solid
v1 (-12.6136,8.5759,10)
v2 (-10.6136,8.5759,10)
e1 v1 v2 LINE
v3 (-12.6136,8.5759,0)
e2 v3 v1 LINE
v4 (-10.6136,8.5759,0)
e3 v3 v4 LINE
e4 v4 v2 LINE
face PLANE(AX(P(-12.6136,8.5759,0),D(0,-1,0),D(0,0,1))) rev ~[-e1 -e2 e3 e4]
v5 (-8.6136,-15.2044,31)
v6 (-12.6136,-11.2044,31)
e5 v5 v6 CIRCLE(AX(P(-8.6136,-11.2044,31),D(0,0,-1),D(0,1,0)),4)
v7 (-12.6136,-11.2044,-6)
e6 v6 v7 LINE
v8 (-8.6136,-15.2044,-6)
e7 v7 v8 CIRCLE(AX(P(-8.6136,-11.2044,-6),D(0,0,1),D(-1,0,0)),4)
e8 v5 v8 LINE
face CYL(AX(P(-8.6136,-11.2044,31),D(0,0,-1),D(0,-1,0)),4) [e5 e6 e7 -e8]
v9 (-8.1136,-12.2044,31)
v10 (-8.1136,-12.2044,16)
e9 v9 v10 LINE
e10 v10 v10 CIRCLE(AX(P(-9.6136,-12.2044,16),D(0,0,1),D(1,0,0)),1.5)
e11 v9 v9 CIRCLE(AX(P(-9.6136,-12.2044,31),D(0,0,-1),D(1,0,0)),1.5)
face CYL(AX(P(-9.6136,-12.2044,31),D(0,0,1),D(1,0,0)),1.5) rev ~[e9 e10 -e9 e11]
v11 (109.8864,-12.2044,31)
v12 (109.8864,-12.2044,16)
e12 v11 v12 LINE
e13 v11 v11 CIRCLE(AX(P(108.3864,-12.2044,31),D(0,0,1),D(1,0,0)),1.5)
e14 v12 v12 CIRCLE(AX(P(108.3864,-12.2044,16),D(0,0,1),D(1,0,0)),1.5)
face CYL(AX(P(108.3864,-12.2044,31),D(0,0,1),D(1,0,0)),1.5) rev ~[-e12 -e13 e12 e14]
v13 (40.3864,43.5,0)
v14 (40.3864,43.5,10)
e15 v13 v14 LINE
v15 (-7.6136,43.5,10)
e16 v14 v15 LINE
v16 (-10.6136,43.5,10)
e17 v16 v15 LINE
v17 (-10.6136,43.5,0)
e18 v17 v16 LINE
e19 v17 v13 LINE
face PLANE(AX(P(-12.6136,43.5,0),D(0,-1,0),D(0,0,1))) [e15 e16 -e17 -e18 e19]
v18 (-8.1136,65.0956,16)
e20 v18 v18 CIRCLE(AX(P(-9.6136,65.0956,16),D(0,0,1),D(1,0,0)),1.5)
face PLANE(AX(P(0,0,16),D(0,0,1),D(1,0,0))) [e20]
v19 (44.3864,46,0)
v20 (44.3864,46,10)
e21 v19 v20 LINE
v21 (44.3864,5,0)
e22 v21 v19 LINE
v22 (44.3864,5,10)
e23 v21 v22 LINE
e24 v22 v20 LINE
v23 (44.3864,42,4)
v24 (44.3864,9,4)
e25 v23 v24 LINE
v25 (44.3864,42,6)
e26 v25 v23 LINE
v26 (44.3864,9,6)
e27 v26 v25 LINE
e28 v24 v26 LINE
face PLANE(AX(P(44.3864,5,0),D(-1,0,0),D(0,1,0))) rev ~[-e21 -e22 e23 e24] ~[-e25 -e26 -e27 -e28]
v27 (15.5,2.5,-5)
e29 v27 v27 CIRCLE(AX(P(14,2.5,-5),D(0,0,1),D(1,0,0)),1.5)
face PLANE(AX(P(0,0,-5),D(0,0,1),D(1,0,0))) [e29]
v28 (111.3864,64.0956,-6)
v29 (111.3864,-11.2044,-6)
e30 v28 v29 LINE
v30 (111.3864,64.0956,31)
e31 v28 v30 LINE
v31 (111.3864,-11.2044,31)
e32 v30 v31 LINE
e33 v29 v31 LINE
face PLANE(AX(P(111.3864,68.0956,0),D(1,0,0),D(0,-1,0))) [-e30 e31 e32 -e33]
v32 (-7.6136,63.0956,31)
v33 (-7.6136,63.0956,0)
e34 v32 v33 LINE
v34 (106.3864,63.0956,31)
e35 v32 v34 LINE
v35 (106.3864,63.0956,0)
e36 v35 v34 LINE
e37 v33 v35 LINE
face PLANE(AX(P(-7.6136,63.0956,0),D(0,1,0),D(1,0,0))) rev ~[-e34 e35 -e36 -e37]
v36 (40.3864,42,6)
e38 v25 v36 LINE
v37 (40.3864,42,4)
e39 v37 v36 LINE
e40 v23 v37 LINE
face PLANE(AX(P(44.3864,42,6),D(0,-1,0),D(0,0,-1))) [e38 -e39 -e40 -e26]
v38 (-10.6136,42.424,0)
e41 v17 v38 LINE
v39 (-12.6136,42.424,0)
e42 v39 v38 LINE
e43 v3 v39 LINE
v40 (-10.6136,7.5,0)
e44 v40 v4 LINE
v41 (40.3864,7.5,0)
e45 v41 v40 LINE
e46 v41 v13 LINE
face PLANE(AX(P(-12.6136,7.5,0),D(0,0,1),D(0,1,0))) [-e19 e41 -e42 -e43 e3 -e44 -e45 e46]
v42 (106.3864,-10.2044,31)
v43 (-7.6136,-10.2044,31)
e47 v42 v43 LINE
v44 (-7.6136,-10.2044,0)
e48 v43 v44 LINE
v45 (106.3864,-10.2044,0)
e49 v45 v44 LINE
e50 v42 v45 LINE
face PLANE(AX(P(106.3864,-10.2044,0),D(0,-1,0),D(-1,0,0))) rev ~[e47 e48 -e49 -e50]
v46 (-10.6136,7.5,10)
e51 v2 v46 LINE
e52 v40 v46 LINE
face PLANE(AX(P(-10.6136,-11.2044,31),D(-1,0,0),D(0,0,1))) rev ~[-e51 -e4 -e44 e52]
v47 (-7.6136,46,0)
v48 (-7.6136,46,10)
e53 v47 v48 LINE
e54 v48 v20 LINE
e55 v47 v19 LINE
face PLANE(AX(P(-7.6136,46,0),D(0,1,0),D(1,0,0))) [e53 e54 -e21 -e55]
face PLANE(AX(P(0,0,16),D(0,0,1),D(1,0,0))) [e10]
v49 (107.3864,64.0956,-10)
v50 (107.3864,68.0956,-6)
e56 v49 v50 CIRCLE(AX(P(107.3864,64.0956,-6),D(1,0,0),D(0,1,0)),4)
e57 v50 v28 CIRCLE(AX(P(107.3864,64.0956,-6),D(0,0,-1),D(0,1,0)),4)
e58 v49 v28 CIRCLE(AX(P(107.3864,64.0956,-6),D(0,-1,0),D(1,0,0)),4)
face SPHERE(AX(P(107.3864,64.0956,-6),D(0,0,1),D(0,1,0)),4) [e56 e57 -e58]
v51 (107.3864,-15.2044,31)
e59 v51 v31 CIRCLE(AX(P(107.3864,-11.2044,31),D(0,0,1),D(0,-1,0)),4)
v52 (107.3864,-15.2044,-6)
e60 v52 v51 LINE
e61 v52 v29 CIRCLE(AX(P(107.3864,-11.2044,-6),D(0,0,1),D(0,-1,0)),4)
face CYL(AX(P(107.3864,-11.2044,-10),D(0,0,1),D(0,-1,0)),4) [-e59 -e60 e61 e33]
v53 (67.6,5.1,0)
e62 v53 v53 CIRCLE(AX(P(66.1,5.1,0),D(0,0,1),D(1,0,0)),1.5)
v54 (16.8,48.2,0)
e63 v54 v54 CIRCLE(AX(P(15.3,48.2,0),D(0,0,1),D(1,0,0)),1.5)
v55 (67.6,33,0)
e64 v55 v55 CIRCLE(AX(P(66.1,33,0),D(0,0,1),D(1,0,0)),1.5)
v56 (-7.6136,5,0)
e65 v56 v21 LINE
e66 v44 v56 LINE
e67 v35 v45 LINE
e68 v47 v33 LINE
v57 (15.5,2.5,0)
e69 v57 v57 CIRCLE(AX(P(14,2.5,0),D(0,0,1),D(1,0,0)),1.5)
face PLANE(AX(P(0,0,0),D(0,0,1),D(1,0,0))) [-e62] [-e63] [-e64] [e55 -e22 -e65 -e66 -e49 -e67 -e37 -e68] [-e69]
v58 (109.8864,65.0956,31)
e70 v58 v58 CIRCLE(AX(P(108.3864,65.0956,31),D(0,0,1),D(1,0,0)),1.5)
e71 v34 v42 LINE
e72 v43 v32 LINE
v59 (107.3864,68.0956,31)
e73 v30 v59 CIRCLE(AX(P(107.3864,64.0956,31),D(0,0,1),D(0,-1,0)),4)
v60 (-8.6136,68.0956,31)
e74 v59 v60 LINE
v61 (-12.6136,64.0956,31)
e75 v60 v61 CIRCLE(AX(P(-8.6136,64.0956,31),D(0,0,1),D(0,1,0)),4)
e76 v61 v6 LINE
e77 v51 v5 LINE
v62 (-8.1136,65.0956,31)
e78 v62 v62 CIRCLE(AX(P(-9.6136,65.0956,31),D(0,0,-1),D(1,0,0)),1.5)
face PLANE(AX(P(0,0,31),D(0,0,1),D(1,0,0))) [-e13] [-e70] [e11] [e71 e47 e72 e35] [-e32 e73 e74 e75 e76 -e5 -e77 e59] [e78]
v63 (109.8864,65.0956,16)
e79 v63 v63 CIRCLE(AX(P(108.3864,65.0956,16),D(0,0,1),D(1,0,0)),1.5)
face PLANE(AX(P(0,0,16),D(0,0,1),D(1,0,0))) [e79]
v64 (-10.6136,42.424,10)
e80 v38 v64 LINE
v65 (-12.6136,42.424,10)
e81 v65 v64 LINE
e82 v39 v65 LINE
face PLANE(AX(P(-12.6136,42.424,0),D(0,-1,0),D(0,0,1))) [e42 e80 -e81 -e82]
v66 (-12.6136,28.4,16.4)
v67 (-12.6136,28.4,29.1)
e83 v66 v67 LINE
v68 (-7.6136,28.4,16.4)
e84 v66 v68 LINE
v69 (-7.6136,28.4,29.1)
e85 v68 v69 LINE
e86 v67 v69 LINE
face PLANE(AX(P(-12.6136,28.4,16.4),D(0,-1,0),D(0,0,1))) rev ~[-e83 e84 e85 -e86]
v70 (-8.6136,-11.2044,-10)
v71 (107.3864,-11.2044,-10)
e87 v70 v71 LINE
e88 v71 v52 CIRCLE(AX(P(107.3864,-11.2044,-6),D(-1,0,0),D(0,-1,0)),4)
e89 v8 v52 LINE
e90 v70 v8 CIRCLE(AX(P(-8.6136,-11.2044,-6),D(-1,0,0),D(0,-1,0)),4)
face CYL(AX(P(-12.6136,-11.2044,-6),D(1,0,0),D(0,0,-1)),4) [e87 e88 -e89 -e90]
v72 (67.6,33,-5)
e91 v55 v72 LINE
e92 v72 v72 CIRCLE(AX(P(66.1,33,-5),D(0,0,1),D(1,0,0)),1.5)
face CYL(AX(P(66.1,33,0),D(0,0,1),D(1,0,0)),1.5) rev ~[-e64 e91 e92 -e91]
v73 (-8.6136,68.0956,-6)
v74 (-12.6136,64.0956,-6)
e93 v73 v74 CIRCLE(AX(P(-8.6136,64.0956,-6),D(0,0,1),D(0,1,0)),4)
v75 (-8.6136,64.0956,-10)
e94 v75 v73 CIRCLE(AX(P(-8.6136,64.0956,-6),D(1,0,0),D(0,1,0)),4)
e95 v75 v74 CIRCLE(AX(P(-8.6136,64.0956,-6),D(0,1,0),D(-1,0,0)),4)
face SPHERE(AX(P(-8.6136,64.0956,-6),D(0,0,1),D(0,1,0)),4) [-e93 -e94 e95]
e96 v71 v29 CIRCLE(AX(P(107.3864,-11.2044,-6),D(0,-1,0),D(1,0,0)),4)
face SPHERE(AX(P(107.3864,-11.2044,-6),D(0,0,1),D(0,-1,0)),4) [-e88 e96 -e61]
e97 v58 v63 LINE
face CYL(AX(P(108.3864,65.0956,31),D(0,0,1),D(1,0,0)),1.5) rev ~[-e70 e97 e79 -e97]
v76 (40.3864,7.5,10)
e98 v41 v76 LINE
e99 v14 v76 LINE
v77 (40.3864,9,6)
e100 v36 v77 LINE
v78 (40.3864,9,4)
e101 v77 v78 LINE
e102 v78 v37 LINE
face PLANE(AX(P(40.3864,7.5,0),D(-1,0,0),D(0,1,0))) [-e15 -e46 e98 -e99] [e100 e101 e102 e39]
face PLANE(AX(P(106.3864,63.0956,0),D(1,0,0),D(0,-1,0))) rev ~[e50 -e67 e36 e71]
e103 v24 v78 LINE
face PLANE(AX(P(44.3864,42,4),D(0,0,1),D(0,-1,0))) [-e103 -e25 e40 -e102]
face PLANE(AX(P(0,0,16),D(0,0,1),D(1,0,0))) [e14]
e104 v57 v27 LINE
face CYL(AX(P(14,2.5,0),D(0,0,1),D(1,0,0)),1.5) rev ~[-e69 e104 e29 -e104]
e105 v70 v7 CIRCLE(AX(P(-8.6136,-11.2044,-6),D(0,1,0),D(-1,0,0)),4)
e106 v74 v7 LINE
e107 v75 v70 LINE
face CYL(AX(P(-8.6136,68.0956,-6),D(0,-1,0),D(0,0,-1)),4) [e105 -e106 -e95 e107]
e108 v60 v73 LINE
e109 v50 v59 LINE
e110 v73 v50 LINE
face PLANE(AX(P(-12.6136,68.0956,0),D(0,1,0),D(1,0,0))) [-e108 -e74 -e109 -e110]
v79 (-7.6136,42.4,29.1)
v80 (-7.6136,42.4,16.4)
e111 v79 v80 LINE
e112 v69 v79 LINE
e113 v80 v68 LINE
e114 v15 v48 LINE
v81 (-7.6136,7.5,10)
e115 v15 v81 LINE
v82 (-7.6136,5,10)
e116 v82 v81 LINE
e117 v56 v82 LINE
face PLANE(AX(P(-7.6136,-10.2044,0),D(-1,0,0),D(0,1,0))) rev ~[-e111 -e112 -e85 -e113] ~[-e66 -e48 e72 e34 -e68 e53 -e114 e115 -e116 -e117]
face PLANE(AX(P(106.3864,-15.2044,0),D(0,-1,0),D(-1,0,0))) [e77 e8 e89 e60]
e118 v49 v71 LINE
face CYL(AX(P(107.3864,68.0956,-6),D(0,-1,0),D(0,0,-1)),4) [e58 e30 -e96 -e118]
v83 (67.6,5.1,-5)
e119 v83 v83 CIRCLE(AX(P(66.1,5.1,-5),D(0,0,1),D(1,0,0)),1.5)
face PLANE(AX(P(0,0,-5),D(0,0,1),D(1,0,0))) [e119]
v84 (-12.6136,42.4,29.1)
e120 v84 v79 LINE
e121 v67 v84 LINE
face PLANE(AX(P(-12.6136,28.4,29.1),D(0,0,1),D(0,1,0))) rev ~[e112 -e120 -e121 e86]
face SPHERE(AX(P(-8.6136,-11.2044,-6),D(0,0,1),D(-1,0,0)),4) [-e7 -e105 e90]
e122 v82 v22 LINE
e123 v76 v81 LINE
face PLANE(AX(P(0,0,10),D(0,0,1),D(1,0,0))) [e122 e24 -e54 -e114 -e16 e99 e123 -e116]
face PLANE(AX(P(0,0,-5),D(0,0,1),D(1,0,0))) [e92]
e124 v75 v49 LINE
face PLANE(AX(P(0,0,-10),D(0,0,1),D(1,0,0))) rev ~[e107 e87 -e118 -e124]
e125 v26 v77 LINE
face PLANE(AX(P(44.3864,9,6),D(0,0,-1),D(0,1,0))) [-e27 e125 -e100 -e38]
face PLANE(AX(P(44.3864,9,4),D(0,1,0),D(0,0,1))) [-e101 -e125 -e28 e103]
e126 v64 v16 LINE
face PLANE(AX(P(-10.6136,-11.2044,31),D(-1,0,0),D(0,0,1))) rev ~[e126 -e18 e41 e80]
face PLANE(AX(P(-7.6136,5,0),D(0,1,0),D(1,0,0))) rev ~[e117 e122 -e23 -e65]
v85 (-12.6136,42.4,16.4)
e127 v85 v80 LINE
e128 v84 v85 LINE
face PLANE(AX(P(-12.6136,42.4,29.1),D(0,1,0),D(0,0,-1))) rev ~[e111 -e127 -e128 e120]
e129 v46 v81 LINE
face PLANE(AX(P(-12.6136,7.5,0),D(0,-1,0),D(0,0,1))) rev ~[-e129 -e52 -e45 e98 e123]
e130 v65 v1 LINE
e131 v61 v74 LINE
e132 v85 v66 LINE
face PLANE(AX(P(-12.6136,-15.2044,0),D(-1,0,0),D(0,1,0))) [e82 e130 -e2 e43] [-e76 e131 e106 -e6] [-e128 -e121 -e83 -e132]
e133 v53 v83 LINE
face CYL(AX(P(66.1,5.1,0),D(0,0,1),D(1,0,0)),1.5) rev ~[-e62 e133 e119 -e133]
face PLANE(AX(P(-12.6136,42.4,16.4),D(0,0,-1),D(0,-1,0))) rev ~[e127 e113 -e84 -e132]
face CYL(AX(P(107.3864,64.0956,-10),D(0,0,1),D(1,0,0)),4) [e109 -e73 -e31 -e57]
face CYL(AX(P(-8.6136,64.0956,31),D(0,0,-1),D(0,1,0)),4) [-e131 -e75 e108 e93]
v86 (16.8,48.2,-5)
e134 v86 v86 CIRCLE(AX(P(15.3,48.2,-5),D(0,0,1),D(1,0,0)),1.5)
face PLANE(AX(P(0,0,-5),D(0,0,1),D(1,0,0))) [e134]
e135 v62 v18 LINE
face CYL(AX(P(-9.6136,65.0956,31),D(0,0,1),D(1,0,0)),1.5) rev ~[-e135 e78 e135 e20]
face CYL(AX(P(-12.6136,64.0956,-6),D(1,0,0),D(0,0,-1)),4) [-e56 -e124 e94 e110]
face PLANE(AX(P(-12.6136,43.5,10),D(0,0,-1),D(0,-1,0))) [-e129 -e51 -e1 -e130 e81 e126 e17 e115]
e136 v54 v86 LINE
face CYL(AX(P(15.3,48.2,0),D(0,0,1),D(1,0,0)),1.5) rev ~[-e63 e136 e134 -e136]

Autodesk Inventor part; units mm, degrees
ref_plane "YZ Plane" through (0, 0, 0) normal (1, 0, 0) x (0, 1, 0)
ref_plane "XZ Plane" through (0, 0, 0) normal (0, 1, 0) x (-1, 0, 0)
ref_plane "XY Plane" through (0, 0, 0) normal (0, 0, 1) x (1, 0, 0)
sketch "Arduino Uno" plane through (0, 0, 0) normal (0, 0, 1) x (1, 0, 0)
  line L0 (0, 0) -> (68.6, 0)
  line L1 (68.6, 0) -> (68.6, 53.3)
  line L2 (68.6, 53.3) -> (0, 53.3)
  line L3 (0, 53.3) -> (0, 0)
  circle A0 centre (14, 2.5) radius 1.5
  circle A1 centre (66.1, 5.1) radius 1.5
  circle A2 centre (66.1, 33) radius 1.5
  circle A3 centre (15.3, 48.2) radius 1.5
  dimension "d6" = 68.6
  dimension "d7" = 53.3
  dimension "d97" = 3
  dimension "d98" = 14
  dimension "d99" = 2.5
  dimension "d100" = 3
  dimension "d101" = 5.1
  dimension "d102" = 66.1
  dimension "d103" = 33
  dimension "d105" = 66.1
  dimension "d106" = 3
  dimension "d107" = 3
  dimension "d108" = 48.2
  dimension "d109" = 15.3
sketch "Sketch2" plane through (0, 0, 0) normal (0, 0, 1) x (1, 0, 0)
  line L0 (-7.6136, -10.2044) -> (-7.6136, 63.0956)
  line L1 (-7.6136, 63.0956) -> (106.3864, 63.0956)
  line L2 (106.3864, 63.0956) -> (106.3864, -10.2044)
  line L3 (106.3864, -10.2044) -> (-7.6136, -10.2044)
  dimension "d29" = 114
  dimension "d39" = 73.3
extrude "Back Plate" add sketch "Sketch2" against normal blind 10
extrude "Uno Mounting Holes" cut sketch "Arduino Uno" against normal blind 5 contours A0 | A1 | A2 | A3
sketch "3.5\" TFT LCD Screen" plane through (0, 0, 0) normal (0, 0, 1) x (1, 0, 0)
  line L0 (88.6005, 0.0003) -> (88.6005, 53.3003)
  line L1 (88.6005, 53.3003) -> (10.6005, 53.3003)
  line L2 (10.6005, 53.3003) -> (10.6005, 0.0003)
  line L3 (10.6005, 0.0003) -> (88.6005, 0.0003)
  line L4 (-7.6136, -10.2044) -> (-7.6136, 63.0956) projected
  line L5 (106.3864, -10.2044) -> (-7.6136, -10.2044) projected
  line L6 (106.3864, 63.0956) -> (106.3864, -10.2044) projected
  line L7 (-7.6136, 63.0956) -> (106.3864, 63.0956) projected
  point P0 (0, 0)
  point P1 (68.6, 0)
  dimension "d35" = 78
  dimension "d36" = 53.3
  dimension "d37" = 78
  dimension "d38" = 53.3
sketch "SD Card Slot" plane through (0, 0, 0) normal (0, 0, 1) x (1, 0, 0)
  line L0 (43.3864, 9.1) -> (-7.6136, 9.1)
  line L1 (-7.6136, 9.1) -> (-7.6136, 44.1)
  line L2 (-7.6136, 44.1) -> (43.3864, 44.1)
  line L3 (43.3864, 44.1) -> (43.3864, 9.1)
  circle A0 centre (14, 2.5) radius 1.6 projected
  line L4 (-7.6136, -10.2044) -> (-7.6136, 63.0956) projected
  circle A1 centre (15.3, 50.7) radius 1.6 projected
  point P0 (0, 0)
  dimension "d41" = 35
  dimension "d42" = 51
  dimension "d44" = 6.6
  dimension "d45" = 0
sketch "Sketch5" plane through (0, 0, 0) normal (0, 0, 1) x (1, 0, 0)
  line L0 (43.3864, 9.1) -> (-7.6136, 9.1) projected
  line L1 (43.3864, 44.1) -> (43.3864, 9.1) projected
  line L2 (-7.6136, 44.1) -> (43.3864, 44.1) projected
  line L3 (-7.6136, 9.1) -> (-7.6136, 44.1) projected
  line L4 (40.3864, 7.5) -> (40.3864, 43.5)
  line L5 (40.3864, 7.5) -> (-7.6136, 7.5)
  line L6 (-7.6136, -10.2044) -> (-7.6136, 63.0956) projected
  line L7 (40.3864, 43.5) -> (-7.6136, 43.5)
  line L8 (-7.6136, 43.5) -> (-7.6136, 46)
  line L9 (-7.6136, 46) -> (44.3864, 46)
  line L10 (-7.6136, 7.5) -> (-7.6136, 5)
  line L11 (-7.6136, 5) -> (44.3864, 5)
  line L12 (44.3864, 5) -> (44.3864, 46)
  circle A0 centre (15.3, 48.2) radius 1.5 projected
  circle A1 centre (14, 2.5) radius 1.5 projected
  point P0 (0, 0)
  dimension "d47" = 2.5
  dimension "d48" = 52
  dimension "d49" = 2.5
  dimension "d115" = 41
  dimension "d116" = 36
  dimension "d117" = 1
extrude "SD Card Slot Slot" add sketch "Sketch5" along normal blind 10 contours L1 L2 L6 L9 L12 L11 L5 L4 L0 | L0 L4 L7 L3 L2 L1
sketch "Sketch6" plane through (44.3864, 5, 0) normal (1, 0, 0) x (0, 0, -1)
  line L0 (0, 41) -> (0, 0) projected
  line L1 (0, 41) -> (-10, 41) projected
  line L2 (-10, 0) -> (-10, 41) projected
  line L3 (0, 0) -> (-10, 0) projected
  line L4 (-6, 37) -> (-4, 37)
  line L5 (-4, 37) -> (-4, 4)
  line L6 (-4, 4) -> (-6, 4)
  line L7 (-6, 4) -> (-6, 37)
  point P0 (0, -5)
  dimension "d52" = 4
extrude "SD Ribbon Slot" cut sketch "Sketch6" against normal through all contours L4 L5 L6 L7
fillet "1.2mm Fillet" [suppressed]
sketch "Sketch7" plane through (0, 0, 0) normal (0, 0, 1) x (1, 0, 0)
  line L0 (106.3864, -10.2044) -> (101.3864, -10.2044)
  line L1 (101.3864, -10.2044) -> (101.3864, -5.2044)
  line L2 (101.3864, -5.2044) -> (106.3864, -5.2044)
  line L3 (106.3864, -5.2044) -> (106.3864, -10.2044)
  line L4 (49.3864, -10.2044) -> (49.3864, 80.0118)
  line L5 (-7.6136, 63.0956) -> (106.3864, 63.0956) projected
  line L6 (106.3864, 26.4456) -> (-34.6963, 26.4456)
  line L7 (-7.6136, -10.2044) -> (-2.6136, -10.2044)
  line L8 (-2.6136, -10.2044) -> (-2.6136, -5.2044)
  line L9 (-2.6136, -5.2044) -> (-7.6136, -5.2044)
  line L10 (-7.6136, -5.2044) -> (-7.6136, -10.2044)
  line L11 (106.3864, 63.0956) -> (101.3864, 63.0956)
  line L12 (101.3864, 63.0956) -> (101.3864, 58.0956)
  line L13 (101.3864, 58.0956) -> (106.3864, 58.0956)
  line L14 (106.3864, 58.0956) -> (106.3864, 63.0956)
  line L15 (-7.6136, 63.0956) -> (-2.6136, 63.0956)
  line L16 (-2.6136, 63.0956) -> (-2.6136, 58.0956)
  line L17 (-2.6136, 58.0956) -> (-7.6136, 58.0956)
  line L18 (-7.6136, 58.0956) -> (-7.6136, 63.0956)
  point P0 (0, 0)
  point P1 (0, 52.8913)
  dimension "d56" = 5
  dimension "d57" = 5
  dimension "d58" = 57
  dimension "d59" = 36.65
extrude "Pillars" [suppressed]
sketch "Sketch8" plane through (0, 0, 31) normal (0, 0, 1) x (1, 0, 0)
  line L0 (101.3864, -10.2044) -> (-2.6136, -10.2044) projected
  line L1 (-7.6136, -5.2044) -> (-2.6136, -5.2044) projected
  line L2 (101.3864, -10.2044) -> (-2.6136, -10.2044)
  line L3 (-2.6136, -10.2044) -> (-2.6136, -5.2044)
  line L4 (-2.6136, -5.2044) -> (101.3864, -5.2044)
  line L5 (101.3864, -5.2044) -> (101.3864, -10.2044)
  line L6 (101.3864, 63.0956) -> (101.3864, 58.0956) projected
  line L7 (106.3864, 63.0956) -> (106.3864, -10.2044) projected
  line L8 (101.3864, 58.0956) -> (106.3864, 58.0956)
  line L9 (106.3864, 58.0956) -> (106.3864, -5.2044)
  line L10 (106.3864, -5.2044) -> (101.3864, -5.2044)
  line L11 (101.3864, -5.2044) -> (101.3864, 58.0956)
  line L12 (-7.6136, 58.0956) -> (-2.6136, 58.0956) projected
  line L13 (-7.6136, 63.0956) -> (106.3864, 63.0956) projected
  line L14 (-2.6136, 58.0956) -> (101.3864, 58.0956)
  line L15 (101.3864, 58.0956) -> (101.3864, 63.0956)
  line L16 (101.3864, 63.0956) -> (-2.6136, 63.0956)
  line L17 (-2.6136, 63.0956) -> (-2.6136, 58.0956)
  line L18 (-2.6136, 58.0956) -> (-7.6136, 58.0956)
  line L19 (-7.6136, 58.0956) -> (-7.6136, -5.2044)
  line L20 (-7.6136, -5.2044) -> (-2.6136, -5.2044)
  line L21 (-2.6136, -5.2044) -> (-2.6136, 58.0956)
  point P0 (0, 0)
extrude "Beams (Will they print?)" [suppressed]
sketch "Sketch9" plane through (0, 0, 0) normal (0, 0, 1) x (1, 0, 0)
  line L0 (106.3864, 63.0956) -> (106.3864, -10.2044) projected
  line L1 (-7.6136, -10.2044) -> (-7.6136, 63.0956) projected
  line L2 (106.3864, -10.2044) -> (-7.6136, -10.2044)
  line L3 (-7.6136, -10.2044) -> (-7.6136, 63.0956)
  line L4 (-7.6136, 63.0956) -> (106.3864, 63.0956) projected
  line L5 (-7.6136, 63.0956) -> (106.3864, 63.0956)
  line L6 (106.3864, 63.0956) -> (106.3864, -10.2044)
  line L7 (106.3864, -10.2044) -> (106.3864, -15.2044)
  line L8 (106.3864, -15.2044) -> (-7.6136, -15.2044)
  line L9 (-7.6136, -15.2044) -> (-12.6136, -15.2044)
  line L10 (-12.6136, -15.2044) -> (-12.6136, 63.0956)
  line L11 (-12.6136, 63.0956) -> (-12.6136, 68.0956)
  line L12 (-12.6136, 68.0956) -> (106.3864, 68.0956)
  line L13 (106.3864, 68.0956) -> (111.3864, 68.0956)
  line L14 (111.3864, 68.0956) -> (111.3864, -15.2044)
  line L15 (111.3864, -15.2044) -> (106.3864, -15.2044)
  point P0 (0, 0)
  dimension "d64" = 5
  dimension "d65" = 5
  dimension "d66" = 5
  dimension "d67" = 5
extrude "Outer Walls (5mm Offset)" add sketch "Sketch9" along normal blind 31 and the other way blind 10
extrude "Extrusion9" [suppressed]
sketch "Sketch10" plane through (-12.6136, -15.2044, 31) normal (-1, 0, 0) x (0, 0, 1)
  line L0 (-31, 63.5044) -> (-31, 78.3) projected
  line L1 (-13.6, 56.6044) -> (-2.9, 56.6044)
  line L2 (-2.9, 56.6044) -> (-2.9, 44.6044)
  line L3 (-2.9, 44.6044) -> (-13.6, 44.6044)
  line L4 (-13.6, 44.6044) -> (-13.6, 56.6044)
  line L5 (-1.9, 43.6044) -> (-1.9, 57.6044)
  line L6 (-1.9, 57.6044) -> (-14.6, 57.6044)
  line L7 (-14.6, 57.6044) -> (-14.6, 43.6044)
  line L8 (-14.6, 43.6044) -> (-1.9, 43.6044)
  line L9 (-25, 57.2044) -> (-25, 24.2044) projected
  line L10 (-25, 24.2044) -> (-27, 24.2044) projected
  line L11 (-27, 24.2044) -> (-27, 57.2044) projected
  line L12 (-27, 57.2044) -> (-25, 57.2044) projected
  line L13 (-31, 22.7044) -> (-31, 58.7044) projected
  line L14 (-31, 22.7044) -> (-21, 22.7044) projected
  line L15 (-21, 58.7044) -> (-21, 22.7044) projected
  line L16 (-31, 58.7044) -> (-21, 58.7044) projected
  point P0 (-31, 68.5047)
  dimension "d82" = 10.7
  dimension "d83" = 12
  dimension "d84" = 1
extrude "SD Card Opening" cut sketch "Sketch10" against normal blind 5 contours L1 L2 L3 L4 | L8 L7 L6 L5 | L9 L10 L11 L12 | L13 L16 L15 L14
fillet "4mm Fillet" radius 4 8 edges at (-12.6136, 68.0956, 10.5) (-12.6136, -15.2044, 10.5) (111.3864, -15.2044, 10.5) (111.3864, 68.0956, 10.5) (49.3864, 68.0956, -10) (-12.6136, 26.4456, -10) (49.3864, -15.2044, -10) (111.3864, 26.4456, -10)
sketch "Sketch11" plane through (0, 0, 0) normal (0, 0, 1) x (1, 0, 0)
  line L0 (98.4778, 47.4456) -> (98.4778, 5.4456) construction
  line L1 (98.4778, 5.4456) -> (86.054, 5.4456) construction
  line L2 (86.054, 5.4456) -> (86.054, 47.4456) construction
  line L3 (86.054, 47.4456) -> (98.4778, 47.4456) construction
  line L4 (-8.6136, 68.0956) -> (107.3864, 68.0956) projected
  line L5 (107.3864, 68.0956) -> (107.3864, 26.4456)
  line L6 (107.3864, 26.4456) -> (48.9636, 26.4456)
  point P0 (0, 0)
  dimension "d88" = 41.65
  dimension "d89" = 42
  dimension "d90" = 21
feature "Inside Text" [suppressed]
sketch "Sketch12" plane through (0, 0, 31) normal (0, 0, 1) x (1, 0, 0)
  circle A0 centre (108.3864, -12.2044) radius 1.5
  line L0 (-12.6136, -15.2044) -> (111.3864, -15.2044) projected
  line L1 (111.3864, -15.2044) -> (111.3864, 68.0956) projected
  line L2 (107.3864, -15.2044) -> (-8.6136, -15.2044) projected
  line L3 (49.3864, -15.2044) -> (49.3864, 77.1219)
  line L4 (-8.6136, -11.2044) -> (-12.6136, -11.2044) projected
  line L5 (-12.6136, -11.2044) -> (-12.6136, 26.4456)
  line L6 (-12.6136, -11.2044) -> (-12.6136, 64.0956) projected
  line L7 (-12.6136, 26.4456) -> (133.0429, 26.4456)
  circle A1 centre (-9.6136, -12.2044) radius 1.5
  line L8 (111.3864, 26.4456) -> (-34.2702, 26.4456)
  circle A2 centre (108.3864, 65.0956) radius 1.5
  line L9 (-8.6136, 64.0956) -> (-12.6136, 64.0956)
  circle A3 centre (-9.6136, 65.0956) radius 1.5
  point P0 (0, 0)
  point P1 (111.3864, -11.2044)
  point P2 (111.3864, 64.0956)
  dimension "d91" = 3
  dimension "d92" = 3
  dimension "d93" = 3
  dimension "d94" = 37.65
extrude "3mm Screw Holes" cut sketch "Sketch12" against normal blind 15 contours A0 | A1 | A2 | A3
sketch "Sketch15" plane through (-12.6136, -11.2044, 31) normal (-1, 0, 0) x (0, 0, 1)
  line L0 (-31, 54.7044) -> (-21, 54.7044) projected
  line L1 (-21, 54.7044) -> (-31, 54.7044)
  line L2 (-31, 54.7044) -> (-31, 53.6284)
  line L3 (-31, 53.6284) -> (-21, 53.6284)
  line L4 (-21, 53.6284) -> (-21, 54.7044)
  line L5 (-21, 36.7044) -> (-31, 36.7044)
  line L6 (-31, 18.7044) -> (-21, 18.7044)
  line L7 (-21, 18.7044) -> (-31, 18.7044)
  line L8 (-31, 18.7044) -> (-31, 19.7803)
  line L9 (-31, 19.7803) -> (-21, 19.7803)
  line L10 (-21, 19.7803) -> (-21, 18.7044)
  point P0 (-31, 11.2044)
  dimension "d123" = 18
extrude "Extra Walls" add sketch "Sketch15" against normal blind 2
properties part number "Back Plate test05"
